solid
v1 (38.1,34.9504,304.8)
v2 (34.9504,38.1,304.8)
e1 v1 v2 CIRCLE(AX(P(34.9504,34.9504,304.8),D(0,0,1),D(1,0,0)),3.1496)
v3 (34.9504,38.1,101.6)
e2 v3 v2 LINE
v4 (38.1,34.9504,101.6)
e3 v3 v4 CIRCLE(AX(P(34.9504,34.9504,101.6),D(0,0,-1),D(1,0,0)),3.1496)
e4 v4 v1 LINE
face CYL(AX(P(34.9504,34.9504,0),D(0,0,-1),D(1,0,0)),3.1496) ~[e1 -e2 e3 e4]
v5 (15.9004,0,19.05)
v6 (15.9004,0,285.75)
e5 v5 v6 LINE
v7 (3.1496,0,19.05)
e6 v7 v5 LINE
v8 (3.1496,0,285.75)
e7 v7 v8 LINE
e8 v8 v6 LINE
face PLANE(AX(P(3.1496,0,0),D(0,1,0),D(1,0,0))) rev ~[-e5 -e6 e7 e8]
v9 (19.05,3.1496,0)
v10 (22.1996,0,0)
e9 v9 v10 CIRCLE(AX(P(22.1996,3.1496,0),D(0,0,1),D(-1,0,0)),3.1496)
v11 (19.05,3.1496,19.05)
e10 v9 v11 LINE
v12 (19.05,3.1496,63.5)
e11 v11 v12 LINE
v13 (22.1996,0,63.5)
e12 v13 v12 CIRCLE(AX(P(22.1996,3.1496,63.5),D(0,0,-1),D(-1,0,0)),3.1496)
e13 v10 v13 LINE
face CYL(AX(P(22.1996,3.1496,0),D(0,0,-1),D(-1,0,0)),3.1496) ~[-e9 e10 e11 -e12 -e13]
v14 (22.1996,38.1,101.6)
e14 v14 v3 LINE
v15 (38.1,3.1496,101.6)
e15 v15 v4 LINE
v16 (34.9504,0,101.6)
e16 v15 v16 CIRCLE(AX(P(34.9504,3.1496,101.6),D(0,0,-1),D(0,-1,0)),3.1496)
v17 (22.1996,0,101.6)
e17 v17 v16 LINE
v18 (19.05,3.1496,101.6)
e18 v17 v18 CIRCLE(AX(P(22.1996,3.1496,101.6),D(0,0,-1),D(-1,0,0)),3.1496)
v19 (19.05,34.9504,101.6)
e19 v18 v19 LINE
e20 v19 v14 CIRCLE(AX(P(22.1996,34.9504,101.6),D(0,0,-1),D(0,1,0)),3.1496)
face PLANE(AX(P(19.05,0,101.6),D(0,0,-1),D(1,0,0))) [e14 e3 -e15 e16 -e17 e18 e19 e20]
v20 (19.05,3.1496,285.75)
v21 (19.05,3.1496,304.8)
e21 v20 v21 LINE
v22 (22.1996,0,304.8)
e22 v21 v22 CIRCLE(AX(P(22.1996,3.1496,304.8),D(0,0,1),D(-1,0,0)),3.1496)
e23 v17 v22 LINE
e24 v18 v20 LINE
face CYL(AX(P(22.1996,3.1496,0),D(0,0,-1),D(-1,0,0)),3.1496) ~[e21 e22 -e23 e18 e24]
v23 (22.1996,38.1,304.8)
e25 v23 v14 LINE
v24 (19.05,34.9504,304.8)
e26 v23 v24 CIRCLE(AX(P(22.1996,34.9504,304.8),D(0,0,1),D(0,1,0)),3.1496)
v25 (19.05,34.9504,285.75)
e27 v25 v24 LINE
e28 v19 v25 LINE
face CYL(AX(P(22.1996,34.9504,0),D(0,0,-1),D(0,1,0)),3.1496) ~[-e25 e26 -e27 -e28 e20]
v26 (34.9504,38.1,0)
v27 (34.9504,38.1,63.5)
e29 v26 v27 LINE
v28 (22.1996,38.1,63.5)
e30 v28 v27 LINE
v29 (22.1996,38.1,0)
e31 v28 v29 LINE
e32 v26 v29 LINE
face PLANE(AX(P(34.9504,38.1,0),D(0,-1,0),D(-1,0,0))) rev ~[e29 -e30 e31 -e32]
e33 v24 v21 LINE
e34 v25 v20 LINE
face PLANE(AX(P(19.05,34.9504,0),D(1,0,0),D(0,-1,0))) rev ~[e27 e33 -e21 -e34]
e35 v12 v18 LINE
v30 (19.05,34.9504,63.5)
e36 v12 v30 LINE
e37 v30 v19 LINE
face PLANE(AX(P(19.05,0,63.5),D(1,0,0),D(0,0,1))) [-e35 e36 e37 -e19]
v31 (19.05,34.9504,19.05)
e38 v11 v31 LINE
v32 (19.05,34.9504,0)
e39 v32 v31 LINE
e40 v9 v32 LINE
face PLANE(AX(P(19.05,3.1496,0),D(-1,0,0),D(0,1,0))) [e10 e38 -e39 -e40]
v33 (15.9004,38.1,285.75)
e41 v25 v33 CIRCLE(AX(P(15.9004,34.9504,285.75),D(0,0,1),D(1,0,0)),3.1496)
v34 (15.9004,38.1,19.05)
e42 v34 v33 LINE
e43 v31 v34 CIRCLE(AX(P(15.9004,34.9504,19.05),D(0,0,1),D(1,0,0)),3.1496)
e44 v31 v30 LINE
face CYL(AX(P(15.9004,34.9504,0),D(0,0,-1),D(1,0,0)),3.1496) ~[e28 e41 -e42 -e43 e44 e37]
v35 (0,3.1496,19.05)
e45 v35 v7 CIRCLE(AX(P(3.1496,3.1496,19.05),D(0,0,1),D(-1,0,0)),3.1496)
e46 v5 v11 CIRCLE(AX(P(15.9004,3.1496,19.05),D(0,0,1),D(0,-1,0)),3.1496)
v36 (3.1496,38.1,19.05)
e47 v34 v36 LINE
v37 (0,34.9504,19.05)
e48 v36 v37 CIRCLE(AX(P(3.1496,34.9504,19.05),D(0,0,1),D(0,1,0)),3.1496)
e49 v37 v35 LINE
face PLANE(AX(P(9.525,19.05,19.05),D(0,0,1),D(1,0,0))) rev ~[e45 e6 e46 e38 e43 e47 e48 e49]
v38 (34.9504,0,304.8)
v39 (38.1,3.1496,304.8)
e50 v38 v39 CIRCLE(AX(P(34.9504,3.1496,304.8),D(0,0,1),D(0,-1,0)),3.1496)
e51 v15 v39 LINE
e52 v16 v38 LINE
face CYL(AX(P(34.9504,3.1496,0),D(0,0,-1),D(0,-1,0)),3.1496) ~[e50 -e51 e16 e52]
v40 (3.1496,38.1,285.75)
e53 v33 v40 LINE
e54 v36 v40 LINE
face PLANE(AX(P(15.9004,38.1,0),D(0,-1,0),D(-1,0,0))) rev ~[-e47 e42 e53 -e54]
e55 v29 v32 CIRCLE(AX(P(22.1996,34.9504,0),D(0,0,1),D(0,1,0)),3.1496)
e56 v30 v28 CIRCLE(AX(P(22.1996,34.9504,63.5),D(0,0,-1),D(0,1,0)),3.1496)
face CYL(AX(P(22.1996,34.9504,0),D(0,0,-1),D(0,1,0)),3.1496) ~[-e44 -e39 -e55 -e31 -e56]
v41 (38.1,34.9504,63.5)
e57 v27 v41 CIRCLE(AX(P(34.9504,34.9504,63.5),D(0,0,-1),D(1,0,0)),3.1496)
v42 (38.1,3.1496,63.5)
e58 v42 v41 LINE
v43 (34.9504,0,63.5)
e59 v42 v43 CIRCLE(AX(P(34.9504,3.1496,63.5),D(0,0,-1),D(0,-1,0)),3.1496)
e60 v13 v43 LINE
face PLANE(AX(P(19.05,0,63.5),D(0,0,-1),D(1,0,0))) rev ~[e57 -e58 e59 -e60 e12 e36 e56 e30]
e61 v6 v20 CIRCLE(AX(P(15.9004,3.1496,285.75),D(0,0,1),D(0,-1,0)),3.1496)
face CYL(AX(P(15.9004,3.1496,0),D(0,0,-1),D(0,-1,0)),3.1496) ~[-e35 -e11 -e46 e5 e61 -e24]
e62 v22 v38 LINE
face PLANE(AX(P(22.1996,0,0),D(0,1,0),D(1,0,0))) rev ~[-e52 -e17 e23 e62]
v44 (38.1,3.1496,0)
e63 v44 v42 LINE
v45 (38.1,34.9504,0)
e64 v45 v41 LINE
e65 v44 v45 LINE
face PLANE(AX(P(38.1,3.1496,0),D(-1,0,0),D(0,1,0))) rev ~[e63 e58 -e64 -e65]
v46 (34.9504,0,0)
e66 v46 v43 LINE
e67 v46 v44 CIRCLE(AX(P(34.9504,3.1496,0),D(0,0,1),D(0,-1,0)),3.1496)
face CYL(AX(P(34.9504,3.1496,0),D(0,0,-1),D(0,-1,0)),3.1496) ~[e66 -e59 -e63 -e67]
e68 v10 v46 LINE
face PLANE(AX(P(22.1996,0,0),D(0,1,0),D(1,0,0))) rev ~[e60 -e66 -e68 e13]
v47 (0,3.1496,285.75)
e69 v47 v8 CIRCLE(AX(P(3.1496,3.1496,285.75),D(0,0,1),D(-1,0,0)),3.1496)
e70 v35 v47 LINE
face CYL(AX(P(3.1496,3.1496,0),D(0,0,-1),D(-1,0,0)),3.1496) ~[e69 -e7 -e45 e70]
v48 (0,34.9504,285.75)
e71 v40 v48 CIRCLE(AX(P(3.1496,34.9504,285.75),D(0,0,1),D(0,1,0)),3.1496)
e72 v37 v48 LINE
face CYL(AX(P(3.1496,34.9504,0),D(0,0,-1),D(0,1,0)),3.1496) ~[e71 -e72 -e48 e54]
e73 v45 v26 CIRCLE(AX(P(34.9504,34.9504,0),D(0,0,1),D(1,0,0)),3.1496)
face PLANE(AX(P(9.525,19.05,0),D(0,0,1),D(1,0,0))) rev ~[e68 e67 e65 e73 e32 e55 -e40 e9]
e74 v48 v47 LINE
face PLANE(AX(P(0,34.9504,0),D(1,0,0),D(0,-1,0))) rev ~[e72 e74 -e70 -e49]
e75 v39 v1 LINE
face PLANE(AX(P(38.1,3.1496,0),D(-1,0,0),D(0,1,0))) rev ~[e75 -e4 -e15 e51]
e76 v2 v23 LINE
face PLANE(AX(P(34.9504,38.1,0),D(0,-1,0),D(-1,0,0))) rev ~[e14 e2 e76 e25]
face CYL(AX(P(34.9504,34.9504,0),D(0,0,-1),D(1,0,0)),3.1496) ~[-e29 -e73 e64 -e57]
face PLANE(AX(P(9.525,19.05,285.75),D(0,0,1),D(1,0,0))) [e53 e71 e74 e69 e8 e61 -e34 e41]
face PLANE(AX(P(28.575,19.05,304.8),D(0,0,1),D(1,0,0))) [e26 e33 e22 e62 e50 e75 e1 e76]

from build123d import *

# Parameters (mm, degrees)
F1_DEPTH = 304.8
F2_DEPTH = 285.75
F3_DEPTH = 19.05
F4_W     = 19.05
F4_H     = 38.1
F5_DEPTH = 38.101


# Not quite as in the source:
# - a feature names something its author has since deleted; it is built from what else it names


with BuildPart() as f1:
    # F0 (on Top) → F1 (new body)
    with BuildSketch(Plane.XY):
        with BuildLine():
            Line((19.05, 34.9504), (19.05, 3.1496))
            ThreePointArc((19.05, 3.1496), (19.972496482, 0.922496482), (22.1996, 0))
            Line((22.1996, 0), (34.9504, 0))
            ThreePointArc((34.9504, 0), (37.177503518, 0.922496482), (38.1, 3.1496))
            Line((38.1, 3.1496), (38.1, 34.9504))
            ThreePointArc((38.1, 34.9504), (37.177503518, 37.177503518), (34.9504, 38.1))
            Line((34.9504, 38.1), (22.1996, 38.1))
            ThreePointArc((22.1996, 38.1), (19.972496482, 37.177503518), (19.05, 34.9504))
        make_face()
    extrude(amount=F1_DEPTH)

    # F0 (on Top) → F2 (join)
    with BuildSketch(Plane.XY):
        with BuildLine():
            ThreePointArc((0, 3.1496), (0.922496482, 0.922496482), (3.1496, 0))
            Line((3.1496, 0), (15.9004, 0))
            ThreePointArc((15.9004, 0), (18.127503518, 0.922496482), (19.05, 3.1496))
            Line((19.05, 3.1496), (19.05, 34.9504))
            ThreePointArc((19.05, 34.9504), (18.127503518, 37.177503518), (15.9004, 38.1))
            Line((15.9004, 38.1), (3.1496, 38.1))
            ThreePointArc((3.1496, 38.1), (0.922496482, 37.177503518), (0, 34.9504))
            Line((0, 34.9504), (0, 3.1496))
        make_face()
        with BuildLine():
            Line((19.05, 34.9504), (19.05, 3.1496))
            ThreePointArc((19.05, 3.1496), (19.972496482, 0.922496482), (22.1996, 0))
            Line((22.1996, 0), (34.9504, 0))
            ThreePointArc((34.9504, 0), (37.177503518, 0.922496482), (38.1, 3.1496))
            Line((38.1, 3.1496), (38.1, 34.9504))
            ThreePointArc((38.1, 34.9504), (37.177503518, 37.177503518), (34.9504, 38.1))
            Line((34.9504, 38.1), (22.1996, 38.1))
            ThreePointArc((22.1996, 38.1), (19.972496482, 37.177503518), (19.05, 34.9504))
        make_face()
    extrude(amount=F2_DEPTH)

    # F0 (on Top) → F3 (cut)
    with BuildSketch(Plane.XY):
        with BuildLine():
            ThreePointArc((0, 3.1496), (0.922496482, 0.922496482), (3.1496, 0))
            Line((3.1496, 0), (15.9004, 0))
            ThreePointArc((15.9004, 0), (18.127503518, 0.922496482), (19.05, 3.1496))
            Line((19.05, 3.1496), (19.05, 34.9504))
            ThreePointArc((19.05, 34.9504), (18.127503518, 37.177503518), (15.9004, 38.1))
            Line((15.9004, 38.1), (3.1496, 38.1))
            ThreePointArc((3.1496, 38.1), (0.922496482, 37.177503518), (0, 34.9504))
            Line((0, 34.9504), (0, 3.1496))
        make_face()
    extrude(amount=F3_DEPTH, mode=Mode.SUBTRACT)

    # F4 (on face) → F5 (cut, through all)
    with BuildSketch(Plane.XZ):
        with Locations((28.575, 82.55)):
            Rectangle(F4_W, F4_H)
    extrude(amount=-F5_DEPTH, mode=Mode.SUBTRACT)


solid = f1.part
